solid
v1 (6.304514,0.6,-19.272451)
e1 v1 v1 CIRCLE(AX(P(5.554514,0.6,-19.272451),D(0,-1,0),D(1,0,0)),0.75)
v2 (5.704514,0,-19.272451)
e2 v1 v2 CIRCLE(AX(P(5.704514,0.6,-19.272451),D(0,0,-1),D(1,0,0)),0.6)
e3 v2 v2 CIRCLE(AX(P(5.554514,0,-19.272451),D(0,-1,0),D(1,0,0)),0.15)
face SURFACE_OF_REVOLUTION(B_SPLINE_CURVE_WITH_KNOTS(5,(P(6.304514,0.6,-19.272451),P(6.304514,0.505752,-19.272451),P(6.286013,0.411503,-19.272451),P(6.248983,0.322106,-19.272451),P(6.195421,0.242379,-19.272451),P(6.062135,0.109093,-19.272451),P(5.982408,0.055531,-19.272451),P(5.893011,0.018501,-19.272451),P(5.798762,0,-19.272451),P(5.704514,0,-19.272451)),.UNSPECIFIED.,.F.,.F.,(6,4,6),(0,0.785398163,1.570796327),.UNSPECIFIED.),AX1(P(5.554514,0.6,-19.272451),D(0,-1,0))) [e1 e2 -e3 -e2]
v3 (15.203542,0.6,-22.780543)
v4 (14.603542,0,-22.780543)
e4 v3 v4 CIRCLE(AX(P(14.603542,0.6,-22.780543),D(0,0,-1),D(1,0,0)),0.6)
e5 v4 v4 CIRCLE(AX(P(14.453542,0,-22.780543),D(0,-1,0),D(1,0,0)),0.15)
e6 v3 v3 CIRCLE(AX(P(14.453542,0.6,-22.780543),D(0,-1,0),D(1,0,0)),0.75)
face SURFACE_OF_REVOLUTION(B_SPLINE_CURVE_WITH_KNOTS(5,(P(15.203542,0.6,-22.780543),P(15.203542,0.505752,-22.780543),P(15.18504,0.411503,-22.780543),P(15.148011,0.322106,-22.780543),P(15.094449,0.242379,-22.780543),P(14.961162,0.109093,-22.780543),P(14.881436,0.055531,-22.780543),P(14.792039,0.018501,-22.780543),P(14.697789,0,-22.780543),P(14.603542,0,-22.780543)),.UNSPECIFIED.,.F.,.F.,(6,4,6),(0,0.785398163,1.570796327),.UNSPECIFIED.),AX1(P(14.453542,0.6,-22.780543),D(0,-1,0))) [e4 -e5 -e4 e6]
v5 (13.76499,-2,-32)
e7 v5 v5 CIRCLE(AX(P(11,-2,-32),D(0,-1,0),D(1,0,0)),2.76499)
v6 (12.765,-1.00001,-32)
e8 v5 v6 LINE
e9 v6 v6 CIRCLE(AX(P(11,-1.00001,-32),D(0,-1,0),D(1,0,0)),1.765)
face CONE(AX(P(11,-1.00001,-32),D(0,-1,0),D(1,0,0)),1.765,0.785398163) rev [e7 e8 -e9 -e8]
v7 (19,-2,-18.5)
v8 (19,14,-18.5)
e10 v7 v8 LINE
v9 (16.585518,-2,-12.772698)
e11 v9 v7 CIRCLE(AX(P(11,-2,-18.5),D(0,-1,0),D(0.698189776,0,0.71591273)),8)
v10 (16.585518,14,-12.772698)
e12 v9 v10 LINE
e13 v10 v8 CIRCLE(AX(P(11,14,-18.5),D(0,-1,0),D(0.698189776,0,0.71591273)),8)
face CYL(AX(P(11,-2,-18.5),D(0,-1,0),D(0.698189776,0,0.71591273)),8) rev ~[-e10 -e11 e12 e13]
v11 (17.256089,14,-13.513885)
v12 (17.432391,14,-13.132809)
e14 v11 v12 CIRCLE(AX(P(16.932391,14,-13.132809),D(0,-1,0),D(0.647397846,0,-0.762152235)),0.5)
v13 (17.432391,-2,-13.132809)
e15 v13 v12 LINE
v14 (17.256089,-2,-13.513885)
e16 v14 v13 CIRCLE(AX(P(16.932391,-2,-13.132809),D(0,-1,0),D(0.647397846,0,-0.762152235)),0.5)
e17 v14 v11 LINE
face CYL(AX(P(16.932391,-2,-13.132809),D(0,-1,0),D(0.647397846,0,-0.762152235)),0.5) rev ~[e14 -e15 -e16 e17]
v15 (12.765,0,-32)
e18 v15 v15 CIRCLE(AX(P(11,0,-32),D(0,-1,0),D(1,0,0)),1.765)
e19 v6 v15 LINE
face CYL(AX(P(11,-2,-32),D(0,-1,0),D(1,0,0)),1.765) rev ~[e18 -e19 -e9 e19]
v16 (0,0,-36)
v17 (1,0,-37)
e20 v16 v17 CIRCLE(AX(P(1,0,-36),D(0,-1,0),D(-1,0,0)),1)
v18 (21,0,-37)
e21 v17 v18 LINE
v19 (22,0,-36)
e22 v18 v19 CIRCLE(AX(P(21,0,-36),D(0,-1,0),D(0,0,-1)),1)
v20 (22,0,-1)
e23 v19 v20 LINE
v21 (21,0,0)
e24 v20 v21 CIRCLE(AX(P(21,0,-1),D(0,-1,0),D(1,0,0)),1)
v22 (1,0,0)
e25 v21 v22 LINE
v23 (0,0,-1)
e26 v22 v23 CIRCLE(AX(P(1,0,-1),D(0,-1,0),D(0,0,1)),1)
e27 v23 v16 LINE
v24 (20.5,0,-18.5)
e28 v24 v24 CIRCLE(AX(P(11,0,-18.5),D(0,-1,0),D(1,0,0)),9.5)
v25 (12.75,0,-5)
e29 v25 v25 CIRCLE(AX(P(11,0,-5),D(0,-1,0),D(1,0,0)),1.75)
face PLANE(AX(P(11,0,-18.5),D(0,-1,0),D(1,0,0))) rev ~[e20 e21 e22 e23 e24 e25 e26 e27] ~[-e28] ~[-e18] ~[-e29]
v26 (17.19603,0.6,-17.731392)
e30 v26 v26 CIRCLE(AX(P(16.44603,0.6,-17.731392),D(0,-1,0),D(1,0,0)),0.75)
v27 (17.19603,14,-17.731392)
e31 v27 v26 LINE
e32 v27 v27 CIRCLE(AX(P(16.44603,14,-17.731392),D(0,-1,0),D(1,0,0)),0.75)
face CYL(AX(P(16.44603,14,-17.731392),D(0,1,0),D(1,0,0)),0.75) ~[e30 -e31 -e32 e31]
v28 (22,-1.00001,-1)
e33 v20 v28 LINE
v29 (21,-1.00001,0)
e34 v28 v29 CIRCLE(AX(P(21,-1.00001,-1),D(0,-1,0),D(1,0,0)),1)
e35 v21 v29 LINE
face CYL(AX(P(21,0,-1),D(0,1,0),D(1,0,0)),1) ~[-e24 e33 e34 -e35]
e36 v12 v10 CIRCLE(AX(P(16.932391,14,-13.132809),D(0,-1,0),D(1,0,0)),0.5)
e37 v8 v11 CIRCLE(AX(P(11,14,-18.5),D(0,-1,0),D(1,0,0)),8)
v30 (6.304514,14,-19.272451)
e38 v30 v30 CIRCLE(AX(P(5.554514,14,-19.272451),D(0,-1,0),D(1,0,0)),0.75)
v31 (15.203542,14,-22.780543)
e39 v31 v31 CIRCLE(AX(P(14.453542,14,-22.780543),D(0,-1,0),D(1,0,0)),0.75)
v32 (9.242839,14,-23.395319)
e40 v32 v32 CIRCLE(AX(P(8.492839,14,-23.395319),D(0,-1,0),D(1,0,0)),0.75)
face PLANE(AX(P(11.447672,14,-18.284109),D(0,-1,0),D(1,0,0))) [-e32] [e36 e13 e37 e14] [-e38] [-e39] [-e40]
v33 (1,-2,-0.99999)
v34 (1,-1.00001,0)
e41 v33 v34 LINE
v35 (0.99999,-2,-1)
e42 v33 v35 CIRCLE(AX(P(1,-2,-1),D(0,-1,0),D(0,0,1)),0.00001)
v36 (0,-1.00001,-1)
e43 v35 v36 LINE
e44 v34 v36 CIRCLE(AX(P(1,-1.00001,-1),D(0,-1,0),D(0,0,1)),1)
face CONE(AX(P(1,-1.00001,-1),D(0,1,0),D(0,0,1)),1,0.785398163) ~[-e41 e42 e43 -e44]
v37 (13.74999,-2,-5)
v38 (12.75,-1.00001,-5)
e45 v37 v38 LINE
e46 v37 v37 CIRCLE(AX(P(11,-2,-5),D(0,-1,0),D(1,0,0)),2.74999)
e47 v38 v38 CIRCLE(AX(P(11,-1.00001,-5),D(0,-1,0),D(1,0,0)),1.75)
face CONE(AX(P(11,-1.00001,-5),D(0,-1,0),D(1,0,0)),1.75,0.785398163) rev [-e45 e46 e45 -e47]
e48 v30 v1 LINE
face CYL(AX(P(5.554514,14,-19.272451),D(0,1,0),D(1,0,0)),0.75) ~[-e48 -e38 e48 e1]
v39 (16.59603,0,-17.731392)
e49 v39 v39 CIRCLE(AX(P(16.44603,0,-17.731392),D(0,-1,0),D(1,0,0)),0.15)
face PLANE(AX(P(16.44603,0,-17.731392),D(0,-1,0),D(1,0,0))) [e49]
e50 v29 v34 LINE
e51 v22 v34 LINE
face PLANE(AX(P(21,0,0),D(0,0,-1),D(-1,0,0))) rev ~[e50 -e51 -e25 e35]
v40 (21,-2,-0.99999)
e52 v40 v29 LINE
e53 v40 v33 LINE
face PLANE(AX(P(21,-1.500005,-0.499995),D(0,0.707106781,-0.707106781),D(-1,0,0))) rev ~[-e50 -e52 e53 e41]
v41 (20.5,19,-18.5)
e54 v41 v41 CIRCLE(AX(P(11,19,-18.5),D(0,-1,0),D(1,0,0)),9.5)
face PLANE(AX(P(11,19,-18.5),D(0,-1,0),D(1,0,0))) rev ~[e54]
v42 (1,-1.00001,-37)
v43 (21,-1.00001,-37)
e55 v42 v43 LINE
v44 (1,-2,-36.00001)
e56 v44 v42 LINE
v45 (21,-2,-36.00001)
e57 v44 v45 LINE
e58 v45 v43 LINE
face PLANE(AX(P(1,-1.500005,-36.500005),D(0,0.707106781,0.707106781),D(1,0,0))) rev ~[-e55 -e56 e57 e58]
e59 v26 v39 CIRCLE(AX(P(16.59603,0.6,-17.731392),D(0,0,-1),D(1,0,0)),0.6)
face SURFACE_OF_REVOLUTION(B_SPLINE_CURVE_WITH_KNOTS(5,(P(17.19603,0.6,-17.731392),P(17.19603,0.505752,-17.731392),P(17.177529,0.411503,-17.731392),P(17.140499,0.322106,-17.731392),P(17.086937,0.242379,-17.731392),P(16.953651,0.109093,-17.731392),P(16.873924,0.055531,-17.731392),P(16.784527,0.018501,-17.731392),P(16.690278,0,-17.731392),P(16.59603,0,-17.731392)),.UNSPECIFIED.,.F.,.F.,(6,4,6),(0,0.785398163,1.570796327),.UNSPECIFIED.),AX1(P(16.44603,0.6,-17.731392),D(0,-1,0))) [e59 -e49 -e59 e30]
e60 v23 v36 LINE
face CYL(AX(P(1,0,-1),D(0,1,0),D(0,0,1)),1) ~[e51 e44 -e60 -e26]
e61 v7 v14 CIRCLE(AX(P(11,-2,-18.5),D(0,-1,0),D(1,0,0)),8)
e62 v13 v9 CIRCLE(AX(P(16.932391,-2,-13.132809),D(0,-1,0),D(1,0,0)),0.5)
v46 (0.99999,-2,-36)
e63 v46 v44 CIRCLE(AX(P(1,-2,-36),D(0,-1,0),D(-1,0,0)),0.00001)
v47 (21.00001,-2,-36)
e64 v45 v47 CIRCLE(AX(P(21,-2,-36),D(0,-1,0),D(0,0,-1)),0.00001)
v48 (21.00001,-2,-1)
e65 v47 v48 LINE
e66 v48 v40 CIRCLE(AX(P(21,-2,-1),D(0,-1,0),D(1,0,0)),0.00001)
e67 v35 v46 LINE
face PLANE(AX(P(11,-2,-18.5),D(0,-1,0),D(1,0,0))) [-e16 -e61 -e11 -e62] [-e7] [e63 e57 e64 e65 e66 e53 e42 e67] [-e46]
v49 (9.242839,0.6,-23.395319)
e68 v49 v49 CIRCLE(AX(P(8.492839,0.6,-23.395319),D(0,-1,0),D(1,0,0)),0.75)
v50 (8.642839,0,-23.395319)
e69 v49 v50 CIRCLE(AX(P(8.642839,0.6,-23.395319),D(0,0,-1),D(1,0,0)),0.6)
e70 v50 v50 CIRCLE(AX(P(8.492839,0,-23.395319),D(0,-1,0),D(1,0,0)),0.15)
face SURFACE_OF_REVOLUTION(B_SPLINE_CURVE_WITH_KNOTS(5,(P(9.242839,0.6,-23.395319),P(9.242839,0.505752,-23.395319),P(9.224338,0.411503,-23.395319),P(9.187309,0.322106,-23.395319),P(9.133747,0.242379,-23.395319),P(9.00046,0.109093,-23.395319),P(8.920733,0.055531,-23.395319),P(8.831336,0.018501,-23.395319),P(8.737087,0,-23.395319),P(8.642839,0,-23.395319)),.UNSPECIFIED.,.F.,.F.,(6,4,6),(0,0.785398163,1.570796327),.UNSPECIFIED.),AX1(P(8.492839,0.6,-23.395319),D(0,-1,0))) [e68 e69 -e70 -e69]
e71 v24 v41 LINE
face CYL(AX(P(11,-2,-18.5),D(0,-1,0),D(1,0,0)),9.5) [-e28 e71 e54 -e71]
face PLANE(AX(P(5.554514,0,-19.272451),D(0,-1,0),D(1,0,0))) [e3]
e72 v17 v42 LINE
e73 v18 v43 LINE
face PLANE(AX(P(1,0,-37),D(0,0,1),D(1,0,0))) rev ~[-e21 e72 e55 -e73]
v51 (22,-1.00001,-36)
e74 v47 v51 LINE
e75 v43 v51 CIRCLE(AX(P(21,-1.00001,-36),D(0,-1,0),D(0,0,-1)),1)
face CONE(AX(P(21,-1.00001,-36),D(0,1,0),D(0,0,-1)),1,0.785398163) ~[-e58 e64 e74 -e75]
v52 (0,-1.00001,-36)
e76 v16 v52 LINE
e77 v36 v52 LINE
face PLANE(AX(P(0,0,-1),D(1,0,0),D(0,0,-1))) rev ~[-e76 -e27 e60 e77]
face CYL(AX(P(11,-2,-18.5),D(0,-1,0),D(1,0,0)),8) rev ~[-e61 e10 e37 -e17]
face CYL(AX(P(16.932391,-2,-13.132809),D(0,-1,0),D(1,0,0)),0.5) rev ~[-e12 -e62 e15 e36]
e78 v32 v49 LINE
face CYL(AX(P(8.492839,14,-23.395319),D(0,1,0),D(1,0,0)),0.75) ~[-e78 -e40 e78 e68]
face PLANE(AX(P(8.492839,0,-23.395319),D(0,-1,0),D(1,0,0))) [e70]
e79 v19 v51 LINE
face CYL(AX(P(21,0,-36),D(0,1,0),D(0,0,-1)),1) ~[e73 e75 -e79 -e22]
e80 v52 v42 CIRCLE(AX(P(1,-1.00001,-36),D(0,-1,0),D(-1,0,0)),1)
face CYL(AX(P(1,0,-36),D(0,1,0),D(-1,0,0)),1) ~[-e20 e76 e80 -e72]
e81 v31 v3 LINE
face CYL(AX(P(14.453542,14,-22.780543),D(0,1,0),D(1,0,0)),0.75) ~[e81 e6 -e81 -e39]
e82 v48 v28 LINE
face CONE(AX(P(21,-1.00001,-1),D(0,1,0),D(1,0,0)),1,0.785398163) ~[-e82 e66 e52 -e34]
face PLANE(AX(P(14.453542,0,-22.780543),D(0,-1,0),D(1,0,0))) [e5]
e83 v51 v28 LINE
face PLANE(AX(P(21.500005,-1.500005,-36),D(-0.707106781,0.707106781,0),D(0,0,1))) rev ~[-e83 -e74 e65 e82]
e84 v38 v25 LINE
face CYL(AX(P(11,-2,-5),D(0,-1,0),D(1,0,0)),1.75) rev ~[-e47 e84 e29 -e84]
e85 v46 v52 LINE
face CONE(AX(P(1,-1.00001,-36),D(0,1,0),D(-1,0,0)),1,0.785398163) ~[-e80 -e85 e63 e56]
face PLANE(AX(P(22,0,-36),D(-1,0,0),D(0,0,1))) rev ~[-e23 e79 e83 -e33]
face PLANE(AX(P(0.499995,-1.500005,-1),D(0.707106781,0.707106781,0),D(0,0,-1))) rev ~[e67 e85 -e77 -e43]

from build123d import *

# Parameters (mm, degrees)
F1_DEPTH  = 2
F2_R      = 9.5
F3_DEPTH  = 21
F5_DEPTH  = 16
F6_R      = 0.75
F7_DEPTH  = 14
F8_R      = 0.6
F9_R      = 1.765
F9_R_2    = 1.75
F10_DEPTH = 2
F11_SIZE  = 0.99999


# Not quite as in the source:
# - a fillet or chamfer is up to 0.001 mm smaller than in the source, because OpenCascade refuses the exact size


with BuildPart() as f1:
    # F0 (on Front) → F1 (new body)
    with BuildSketch(Plane.XZ):
        with BuildLine():
            Line((21, 0), (1, 0))
            ThreePointArc((1, 0), (0.2928932188, -0.2928932188), (0, -1))
            Line((0, -1), (0, -36))
            ThreePointArc((0, -36), (0.2928932188, -36.7071067812), (1, -37))
            Line((1, -37), (21, -37))
            ThreePointArc((21, -37), (21.7071067812, -36.7071067812), (22, -36))
            Line((22, -36), (22, -1))
            ThreePointArc((22, -1), (21.7071067812, -0.2928932188), (21, 0))
        make_face()
    extrude(amount=F1_DEPTH)

    # F2 (on face) → F3 (join)
    with BuildSketch(Plane.XZ.offset(2)):
        with Locations((11, -18.5)):
            Circle(F2_R)
    extrude(amount=-F3_DEPTH)

    # F4 (on face) → F5 (cut)
    with BuildSketch(Plane.XZ.offset(2)):
        with BuildLine():
            ThreePointArc((16.5855182065, -12.7726981601), (3.6282924077, -21.6077205753), (19, -18.5))
            ThreePointArc((19, -18.5), (18.5514473986, -15.8588558944), (17.2560894533, -13.5138848036))
            ThreePointArc((17.2560894533, -13.5138848036), (16.561616122, -13.4682581434), (16.5855182065, -12.7726981601))
        make_face()
        with BuildLine():
            ThreePointArc((16.5855182065, -12.7726981601), (16.561616122, -13.4682581434), (17.2560894533, -13.5138848036))
            ThreePointArc((17.2560894533, -13.5138848036), (16.9323905302, -13.1328086863), (16.5855182065, -12.7726981601))
        make_face()
        with BuildLine():
            ThreePointArc((16.5855182065, -12.7726981601), (16.9323905302, -13.1328086863), (17.2560894533, -13.5138848036))
            ThreePointArc((17.2560894533, -13.5138848036), (17.3861798324, -13.3427497952), (17.4323905302, -13.1328086863))
            ThreePointArc((17.4323905302, -13.1328086863), (17.128048188, -12.6726803554), (16.5855182065, -12.7726981601))
        make_face()
    extrude(amount=-F5_DEPTH, mode=Mode.SUBTRACT)

    # F6 (on face) → F7 (join)
    with BuildSketch(Plane.XZ.offset(-14)):
        with Locations((14.4535416495, -22.7805431986)):
            Circle(F6_R)
        with Locations((8.4928393267, -23.3953187188)):
            Circle(F6_R)
        with Locations((5.5545138952, -19.272451346)):
            Circle(F6_R)
        with Locations((16.4460298856, -17.7313918519)):
            Circle(F6_R)
    extrude(amount=F7_DEPTH)

    # F8
    f8_edges = [f1.edges().sort_by_distance(p)[0] for p in [
        (15.69603, 0, -17.731392),
        (13.703542, 0, -22.780543),
        (7.742839, 0, -23.395319),
        (4.804514, 0, -19.272451),
    ]]
    fillet(f8_edges, radius=F8_R)

    # F9 (on face) → F10 (cut, through all)
    with BuildSketch(Plane.XZ.offset(2)):
        with Locations((11, -32)):
            Circle(F9_R)
        with Locations((11, -5)):
            Circle(F9_R_2)
    extrude(amount=-F10_DEPTH, mode=Mode.SUBTRACT)

    # F11 (size 1 in the source; OpenCascade refuses exactly that, so slightly less here)
    f11_edges = [f1.edges().sort_by_distance(p)[0] for p in [
        (9.25, -2, -5),
        (9.235, -2, -32),
        (22, -2, -18.5),
        (11, -2, -37),
        (0, -2, -18.5),
        (11, -2, 0),
        (21.707107, -2, -0.292893),
        (0.292893, -2, -0.292893),
        (21.707107, -2, -36.707107),
        (0.292893, -2, -36.707107),
    ]]
    chamfer(f11_edges, length=F11_SIZE)


solid = f1.part
